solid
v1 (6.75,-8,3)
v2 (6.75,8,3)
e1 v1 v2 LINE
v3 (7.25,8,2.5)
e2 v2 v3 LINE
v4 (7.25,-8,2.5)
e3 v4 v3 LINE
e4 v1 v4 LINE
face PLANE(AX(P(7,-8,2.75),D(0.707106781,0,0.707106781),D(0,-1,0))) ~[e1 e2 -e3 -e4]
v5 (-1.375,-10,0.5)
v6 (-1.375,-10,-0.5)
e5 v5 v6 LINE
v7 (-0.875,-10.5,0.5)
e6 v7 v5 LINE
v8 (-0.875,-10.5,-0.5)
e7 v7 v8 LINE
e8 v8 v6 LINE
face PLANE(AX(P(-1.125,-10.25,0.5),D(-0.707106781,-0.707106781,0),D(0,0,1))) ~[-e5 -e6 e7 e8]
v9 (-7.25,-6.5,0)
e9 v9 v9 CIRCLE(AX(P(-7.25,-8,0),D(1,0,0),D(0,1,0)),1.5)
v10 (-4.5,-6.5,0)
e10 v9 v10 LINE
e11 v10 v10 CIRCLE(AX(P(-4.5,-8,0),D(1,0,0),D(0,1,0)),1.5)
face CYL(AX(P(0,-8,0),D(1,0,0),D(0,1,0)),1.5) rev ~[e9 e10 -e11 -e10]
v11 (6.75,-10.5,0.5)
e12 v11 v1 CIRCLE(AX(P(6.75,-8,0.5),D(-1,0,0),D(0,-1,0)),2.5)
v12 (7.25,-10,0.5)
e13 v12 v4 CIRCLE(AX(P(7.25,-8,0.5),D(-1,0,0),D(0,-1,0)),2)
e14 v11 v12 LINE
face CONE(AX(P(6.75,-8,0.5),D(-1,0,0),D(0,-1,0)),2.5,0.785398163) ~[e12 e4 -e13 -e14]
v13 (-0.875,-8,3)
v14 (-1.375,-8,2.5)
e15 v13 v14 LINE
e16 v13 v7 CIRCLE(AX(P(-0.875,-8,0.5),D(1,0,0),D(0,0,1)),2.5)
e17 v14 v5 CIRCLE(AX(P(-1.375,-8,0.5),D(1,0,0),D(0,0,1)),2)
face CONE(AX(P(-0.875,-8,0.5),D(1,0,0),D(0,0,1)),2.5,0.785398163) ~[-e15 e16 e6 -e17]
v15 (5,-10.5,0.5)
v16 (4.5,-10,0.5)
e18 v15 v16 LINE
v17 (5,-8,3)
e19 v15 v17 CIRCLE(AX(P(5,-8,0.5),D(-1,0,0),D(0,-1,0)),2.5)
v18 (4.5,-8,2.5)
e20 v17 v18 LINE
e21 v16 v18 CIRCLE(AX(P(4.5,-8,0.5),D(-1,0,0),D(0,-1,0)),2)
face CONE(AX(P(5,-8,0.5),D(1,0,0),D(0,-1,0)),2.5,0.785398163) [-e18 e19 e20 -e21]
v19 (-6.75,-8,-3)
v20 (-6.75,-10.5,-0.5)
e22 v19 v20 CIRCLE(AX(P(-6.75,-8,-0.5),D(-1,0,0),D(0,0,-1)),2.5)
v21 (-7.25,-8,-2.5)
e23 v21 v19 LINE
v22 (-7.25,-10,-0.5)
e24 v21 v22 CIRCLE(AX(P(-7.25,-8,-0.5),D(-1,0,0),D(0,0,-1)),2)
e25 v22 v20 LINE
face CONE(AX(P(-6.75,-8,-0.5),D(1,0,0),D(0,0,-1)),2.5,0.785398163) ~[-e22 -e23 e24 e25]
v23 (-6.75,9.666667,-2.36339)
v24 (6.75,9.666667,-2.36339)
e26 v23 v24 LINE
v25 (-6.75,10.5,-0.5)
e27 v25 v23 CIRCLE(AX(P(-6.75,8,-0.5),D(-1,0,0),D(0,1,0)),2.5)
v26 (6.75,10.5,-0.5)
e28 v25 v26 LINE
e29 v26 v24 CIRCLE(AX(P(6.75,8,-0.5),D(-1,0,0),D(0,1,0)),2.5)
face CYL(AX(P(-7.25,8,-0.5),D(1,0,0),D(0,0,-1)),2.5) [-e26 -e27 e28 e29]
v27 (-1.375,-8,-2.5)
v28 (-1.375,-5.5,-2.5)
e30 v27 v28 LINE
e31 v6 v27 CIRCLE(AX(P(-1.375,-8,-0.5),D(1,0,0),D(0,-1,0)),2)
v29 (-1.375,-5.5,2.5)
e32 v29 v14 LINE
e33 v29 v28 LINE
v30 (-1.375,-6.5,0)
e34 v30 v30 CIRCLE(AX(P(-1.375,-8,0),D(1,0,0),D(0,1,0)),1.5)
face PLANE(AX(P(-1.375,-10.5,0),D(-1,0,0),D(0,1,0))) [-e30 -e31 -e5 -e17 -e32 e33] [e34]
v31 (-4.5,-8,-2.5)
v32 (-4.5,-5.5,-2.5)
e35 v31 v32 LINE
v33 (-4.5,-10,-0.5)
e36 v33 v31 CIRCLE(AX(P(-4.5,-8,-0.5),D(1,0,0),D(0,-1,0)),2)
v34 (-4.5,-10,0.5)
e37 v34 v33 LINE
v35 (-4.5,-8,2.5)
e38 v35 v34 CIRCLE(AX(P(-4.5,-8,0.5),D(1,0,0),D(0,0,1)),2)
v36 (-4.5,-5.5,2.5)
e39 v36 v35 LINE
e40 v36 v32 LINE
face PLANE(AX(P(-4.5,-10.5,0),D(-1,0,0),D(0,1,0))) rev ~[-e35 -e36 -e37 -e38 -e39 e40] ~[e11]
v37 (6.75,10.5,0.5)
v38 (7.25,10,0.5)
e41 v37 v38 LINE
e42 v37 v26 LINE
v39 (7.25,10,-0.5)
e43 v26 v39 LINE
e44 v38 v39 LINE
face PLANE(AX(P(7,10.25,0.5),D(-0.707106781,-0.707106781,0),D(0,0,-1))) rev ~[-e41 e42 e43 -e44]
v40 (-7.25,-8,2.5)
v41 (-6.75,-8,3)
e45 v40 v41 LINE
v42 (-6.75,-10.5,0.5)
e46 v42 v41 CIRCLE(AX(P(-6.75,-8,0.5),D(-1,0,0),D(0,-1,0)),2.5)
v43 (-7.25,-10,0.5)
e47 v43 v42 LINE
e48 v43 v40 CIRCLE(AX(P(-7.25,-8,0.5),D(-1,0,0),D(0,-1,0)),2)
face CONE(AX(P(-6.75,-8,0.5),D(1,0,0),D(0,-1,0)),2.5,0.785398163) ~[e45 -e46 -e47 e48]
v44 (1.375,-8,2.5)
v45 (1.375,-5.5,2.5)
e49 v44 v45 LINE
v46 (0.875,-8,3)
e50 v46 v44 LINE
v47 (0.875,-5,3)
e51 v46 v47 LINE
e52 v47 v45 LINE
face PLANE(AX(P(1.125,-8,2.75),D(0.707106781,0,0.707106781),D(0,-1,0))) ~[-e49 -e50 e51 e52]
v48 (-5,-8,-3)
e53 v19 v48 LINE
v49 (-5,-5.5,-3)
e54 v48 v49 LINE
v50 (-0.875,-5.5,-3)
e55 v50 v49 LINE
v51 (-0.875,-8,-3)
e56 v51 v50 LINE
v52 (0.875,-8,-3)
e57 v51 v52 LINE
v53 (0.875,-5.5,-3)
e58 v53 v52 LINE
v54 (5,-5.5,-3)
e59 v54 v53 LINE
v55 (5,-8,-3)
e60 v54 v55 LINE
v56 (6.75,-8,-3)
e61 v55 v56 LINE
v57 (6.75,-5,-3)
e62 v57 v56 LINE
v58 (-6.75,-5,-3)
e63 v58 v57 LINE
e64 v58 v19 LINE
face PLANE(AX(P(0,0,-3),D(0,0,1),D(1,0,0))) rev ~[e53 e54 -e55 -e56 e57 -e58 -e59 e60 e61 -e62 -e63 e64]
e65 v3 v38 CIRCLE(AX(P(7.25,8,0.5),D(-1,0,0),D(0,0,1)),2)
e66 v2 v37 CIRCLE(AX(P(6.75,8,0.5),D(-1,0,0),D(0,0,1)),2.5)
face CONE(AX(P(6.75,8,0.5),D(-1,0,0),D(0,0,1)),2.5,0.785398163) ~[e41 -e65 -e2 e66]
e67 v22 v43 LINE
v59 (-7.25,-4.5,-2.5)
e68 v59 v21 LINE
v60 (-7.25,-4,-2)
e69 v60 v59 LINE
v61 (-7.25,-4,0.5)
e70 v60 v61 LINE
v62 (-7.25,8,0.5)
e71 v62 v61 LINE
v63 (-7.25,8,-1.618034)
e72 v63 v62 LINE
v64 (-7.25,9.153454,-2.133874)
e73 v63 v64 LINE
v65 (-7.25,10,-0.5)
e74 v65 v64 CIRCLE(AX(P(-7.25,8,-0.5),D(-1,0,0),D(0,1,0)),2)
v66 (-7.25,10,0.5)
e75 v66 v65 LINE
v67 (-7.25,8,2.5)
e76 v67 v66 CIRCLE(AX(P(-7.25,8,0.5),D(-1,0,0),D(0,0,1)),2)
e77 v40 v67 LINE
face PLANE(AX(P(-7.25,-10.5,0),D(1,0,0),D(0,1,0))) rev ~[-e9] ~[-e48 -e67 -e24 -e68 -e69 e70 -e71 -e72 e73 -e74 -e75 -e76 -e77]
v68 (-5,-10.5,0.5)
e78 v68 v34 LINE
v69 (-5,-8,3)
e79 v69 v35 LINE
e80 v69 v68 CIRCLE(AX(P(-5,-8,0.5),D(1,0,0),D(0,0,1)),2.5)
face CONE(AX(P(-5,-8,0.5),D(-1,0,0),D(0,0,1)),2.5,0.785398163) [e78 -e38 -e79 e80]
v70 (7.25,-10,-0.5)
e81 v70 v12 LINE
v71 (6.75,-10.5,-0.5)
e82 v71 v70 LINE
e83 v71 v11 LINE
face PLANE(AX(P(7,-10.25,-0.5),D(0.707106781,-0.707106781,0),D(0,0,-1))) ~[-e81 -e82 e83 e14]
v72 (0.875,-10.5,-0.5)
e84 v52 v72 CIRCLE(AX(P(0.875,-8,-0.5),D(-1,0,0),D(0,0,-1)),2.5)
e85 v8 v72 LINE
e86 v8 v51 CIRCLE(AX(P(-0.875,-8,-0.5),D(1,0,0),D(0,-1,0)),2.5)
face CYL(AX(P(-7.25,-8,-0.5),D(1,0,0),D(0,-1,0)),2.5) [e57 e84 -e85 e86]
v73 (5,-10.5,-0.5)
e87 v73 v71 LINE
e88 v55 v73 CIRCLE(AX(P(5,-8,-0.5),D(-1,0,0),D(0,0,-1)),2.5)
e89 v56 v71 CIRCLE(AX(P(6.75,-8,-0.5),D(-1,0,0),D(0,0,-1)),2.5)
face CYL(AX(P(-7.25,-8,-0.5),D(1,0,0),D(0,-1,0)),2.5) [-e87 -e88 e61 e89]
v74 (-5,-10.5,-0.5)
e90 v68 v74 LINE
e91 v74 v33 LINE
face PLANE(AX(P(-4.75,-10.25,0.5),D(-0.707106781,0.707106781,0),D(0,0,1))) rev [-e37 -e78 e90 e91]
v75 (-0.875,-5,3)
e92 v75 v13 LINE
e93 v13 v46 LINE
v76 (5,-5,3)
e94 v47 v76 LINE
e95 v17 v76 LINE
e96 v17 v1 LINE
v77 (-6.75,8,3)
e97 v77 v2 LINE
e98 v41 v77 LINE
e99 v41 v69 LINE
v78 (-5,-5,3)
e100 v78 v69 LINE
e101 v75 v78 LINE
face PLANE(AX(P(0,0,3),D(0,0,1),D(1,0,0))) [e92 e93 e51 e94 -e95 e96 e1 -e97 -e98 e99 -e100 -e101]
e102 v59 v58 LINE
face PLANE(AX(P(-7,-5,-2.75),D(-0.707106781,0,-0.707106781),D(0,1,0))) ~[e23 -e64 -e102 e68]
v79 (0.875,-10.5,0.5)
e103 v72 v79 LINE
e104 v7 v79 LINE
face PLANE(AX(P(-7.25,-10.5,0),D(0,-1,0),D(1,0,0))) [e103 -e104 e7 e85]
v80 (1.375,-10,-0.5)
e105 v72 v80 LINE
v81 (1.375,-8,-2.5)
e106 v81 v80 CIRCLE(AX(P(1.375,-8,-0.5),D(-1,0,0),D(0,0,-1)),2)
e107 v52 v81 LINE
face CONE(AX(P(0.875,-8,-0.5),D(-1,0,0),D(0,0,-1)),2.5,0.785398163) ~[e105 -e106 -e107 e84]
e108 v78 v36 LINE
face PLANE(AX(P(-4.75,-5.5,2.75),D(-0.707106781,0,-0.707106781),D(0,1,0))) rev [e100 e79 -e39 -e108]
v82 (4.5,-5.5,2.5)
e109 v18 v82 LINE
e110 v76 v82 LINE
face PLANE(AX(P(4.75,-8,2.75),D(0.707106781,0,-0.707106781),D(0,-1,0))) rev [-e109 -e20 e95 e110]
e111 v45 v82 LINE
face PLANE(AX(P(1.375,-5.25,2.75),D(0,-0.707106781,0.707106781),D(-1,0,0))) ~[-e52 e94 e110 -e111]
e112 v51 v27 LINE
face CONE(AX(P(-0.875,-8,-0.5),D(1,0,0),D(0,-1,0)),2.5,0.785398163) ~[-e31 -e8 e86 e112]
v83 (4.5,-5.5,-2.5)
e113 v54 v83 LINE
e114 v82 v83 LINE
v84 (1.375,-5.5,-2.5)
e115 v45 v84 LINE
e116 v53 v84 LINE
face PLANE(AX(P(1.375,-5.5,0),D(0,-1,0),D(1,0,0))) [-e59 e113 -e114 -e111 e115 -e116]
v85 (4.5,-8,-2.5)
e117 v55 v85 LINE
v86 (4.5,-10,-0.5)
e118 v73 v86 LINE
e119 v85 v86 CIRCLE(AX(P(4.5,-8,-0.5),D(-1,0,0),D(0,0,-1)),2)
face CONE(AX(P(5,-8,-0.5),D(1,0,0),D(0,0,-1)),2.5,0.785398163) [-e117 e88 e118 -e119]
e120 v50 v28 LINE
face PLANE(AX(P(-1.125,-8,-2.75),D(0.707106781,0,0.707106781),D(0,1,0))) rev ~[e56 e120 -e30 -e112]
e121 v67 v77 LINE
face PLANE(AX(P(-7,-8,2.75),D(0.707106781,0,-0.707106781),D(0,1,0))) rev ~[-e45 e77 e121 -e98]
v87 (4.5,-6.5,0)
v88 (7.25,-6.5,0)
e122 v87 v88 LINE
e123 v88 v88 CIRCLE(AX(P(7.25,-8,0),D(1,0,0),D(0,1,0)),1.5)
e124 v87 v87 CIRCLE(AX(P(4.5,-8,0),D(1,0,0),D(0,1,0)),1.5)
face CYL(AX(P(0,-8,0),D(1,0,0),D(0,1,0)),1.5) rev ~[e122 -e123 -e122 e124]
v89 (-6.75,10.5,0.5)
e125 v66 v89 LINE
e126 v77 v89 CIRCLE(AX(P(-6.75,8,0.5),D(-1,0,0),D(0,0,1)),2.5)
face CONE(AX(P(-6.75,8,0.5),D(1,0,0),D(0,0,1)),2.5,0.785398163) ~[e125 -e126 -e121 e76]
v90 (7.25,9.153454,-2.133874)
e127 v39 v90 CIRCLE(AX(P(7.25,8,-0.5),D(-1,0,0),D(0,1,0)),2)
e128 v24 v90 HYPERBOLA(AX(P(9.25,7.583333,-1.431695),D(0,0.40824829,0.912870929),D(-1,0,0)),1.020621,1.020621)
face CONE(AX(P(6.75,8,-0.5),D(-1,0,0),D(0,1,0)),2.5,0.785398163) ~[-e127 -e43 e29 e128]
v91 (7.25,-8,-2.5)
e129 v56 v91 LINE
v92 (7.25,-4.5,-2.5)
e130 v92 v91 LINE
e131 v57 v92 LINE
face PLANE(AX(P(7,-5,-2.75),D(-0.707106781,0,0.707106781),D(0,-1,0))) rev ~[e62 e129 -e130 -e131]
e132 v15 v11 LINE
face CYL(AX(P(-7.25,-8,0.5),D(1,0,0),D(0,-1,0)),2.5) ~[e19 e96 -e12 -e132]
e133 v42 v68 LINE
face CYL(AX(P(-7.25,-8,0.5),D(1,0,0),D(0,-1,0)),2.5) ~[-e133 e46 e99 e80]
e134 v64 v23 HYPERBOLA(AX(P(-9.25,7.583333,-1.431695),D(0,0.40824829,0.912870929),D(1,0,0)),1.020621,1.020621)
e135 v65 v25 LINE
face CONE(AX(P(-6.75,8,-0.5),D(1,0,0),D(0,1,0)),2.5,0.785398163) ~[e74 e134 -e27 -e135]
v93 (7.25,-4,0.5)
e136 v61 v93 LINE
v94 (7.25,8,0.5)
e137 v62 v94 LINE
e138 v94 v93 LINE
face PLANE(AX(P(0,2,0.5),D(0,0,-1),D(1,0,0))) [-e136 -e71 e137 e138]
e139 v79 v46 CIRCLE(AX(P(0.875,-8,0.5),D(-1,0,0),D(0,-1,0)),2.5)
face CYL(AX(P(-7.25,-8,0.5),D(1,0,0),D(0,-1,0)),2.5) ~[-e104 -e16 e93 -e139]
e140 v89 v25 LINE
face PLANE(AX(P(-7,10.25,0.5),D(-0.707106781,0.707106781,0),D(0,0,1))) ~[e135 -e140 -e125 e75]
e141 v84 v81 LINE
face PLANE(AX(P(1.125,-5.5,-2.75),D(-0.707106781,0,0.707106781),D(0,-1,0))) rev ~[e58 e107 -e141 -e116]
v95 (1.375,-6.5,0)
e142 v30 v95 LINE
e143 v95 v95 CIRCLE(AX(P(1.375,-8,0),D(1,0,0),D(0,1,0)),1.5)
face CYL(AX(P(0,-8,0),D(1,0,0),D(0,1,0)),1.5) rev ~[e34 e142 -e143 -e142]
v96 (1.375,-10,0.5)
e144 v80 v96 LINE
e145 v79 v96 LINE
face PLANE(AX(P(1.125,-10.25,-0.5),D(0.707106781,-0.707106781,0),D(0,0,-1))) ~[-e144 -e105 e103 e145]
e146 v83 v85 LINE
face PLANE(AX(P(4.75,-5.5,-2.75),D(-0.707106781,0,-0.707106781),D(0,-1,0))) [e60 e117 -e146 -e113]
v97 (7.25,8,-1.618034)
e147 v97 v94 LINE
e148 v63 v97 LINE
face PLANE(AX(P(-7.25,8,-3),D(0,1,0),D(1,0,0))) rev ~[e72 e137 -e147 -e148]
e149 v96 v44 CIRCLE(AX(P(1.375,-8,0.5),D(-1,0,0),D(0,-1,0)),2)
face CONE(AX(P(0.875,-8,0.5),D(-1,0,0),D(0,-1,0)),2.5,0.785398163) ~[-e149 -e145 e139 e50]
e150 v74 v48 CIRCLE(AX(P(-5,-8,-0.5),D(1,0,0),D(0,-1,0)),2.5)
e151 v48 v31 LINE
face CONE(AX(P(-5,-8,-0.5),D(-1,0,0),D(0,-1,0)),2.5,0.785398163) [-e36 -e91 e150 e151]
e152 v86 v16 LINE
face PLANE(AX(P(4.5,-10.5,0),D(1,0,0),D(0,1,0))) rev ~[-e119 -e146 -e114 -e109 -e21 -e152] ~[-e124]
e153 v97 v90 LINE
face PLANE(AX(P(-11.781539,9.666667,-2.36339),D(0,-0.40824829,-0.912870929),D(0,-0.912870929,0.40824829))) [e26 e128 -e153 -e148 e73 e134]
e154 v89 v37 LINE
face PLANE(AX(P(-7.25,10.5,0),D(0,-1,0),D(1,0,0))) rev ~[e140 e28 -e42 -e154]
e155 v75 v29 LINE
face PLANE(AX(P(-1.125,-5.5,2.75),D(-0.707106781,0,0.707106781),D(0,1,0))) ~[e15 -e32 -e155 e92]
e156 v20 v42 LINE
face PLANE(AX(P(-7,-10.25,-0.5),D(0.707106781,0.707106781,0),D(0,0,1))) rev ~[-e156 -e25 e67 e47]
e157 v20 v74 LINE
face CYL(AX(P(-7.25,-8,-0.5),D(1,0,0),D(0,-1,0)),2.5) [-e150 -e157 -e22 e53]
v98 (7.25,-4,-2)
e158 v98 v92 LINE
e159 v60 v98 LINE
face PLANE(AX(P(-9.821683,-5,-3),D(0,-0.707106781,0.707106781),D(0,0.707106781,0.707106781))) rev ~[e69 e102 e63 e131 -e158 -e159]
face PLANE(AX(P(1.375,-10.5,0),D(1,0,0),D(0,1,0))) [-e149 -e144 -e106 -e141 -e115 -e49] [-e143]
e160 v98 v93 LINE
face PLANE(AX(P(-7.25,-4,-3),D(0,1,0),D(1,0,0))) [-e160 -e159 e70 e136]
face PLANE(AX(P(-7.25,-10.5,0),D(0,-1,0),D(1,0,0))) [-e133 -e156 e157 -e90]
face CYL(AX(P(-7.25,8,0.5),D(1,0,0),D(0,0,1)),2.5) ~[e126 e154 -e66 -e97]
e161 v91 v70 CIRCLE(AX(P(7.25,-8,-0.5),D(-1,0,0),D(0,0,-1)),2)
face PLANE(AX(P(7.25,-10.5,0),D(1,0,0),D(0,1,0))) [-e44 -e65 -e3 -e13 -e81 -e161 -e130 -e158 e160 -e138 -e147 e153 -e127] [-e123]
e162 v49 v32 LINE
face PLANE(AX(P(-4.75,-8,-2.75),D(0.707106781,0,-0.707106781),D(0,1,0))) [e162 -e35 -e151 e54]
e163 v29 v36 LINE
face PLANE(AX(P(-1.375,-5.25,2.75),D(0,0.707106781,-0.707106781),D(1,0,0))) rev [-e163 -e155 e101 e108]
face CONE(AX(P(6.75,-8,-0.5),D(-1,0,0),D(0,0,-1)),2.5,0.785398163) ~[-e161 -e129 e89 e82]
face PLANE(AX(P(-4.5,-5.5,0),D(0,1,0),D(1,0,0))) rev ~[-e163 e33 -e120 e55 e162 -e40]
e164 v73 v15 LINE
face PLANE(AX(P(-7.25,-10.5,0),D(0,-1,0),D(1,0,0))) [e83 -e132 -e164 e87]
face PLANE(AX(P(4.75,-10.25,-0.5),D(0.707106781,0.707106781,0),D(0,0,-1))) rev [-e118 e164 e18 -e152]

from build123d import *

# Parameters (mm, degrees)
F0_W        = 14.5
F0_H        = 21
F1_DEPTH    = 3
F2_R        = 1.5
F3_DEPTH    = 25
F4_R        = 2.5
F5_W        = 3.125
F5_H        = 5
F6_DEPTH    = 12.5
F7_W        = 14.5
F7_H        = 12
F8_DEPTH    = 3.5
F9_T1_DEPTH = 19.6433659759
F9_T3_DEPTH = 23.5630770458
F10_SIZE    = 0.5


# Not quite as in the source:
# - a fillet or chamfer that OpenCascade refuses, or shapes differently, is made with other operations: its cross-section is extruded or revolved along the edge and cut away or added


with BuildPart() as f1:
    # F0 (on Top) → F1 (new body, symmetric)
    with BuildSketch(Plane.XY):
        Rectangle(F0_W, F0_H)
    extrude(amount=F1_DEPTH, both=True)

    # F2 (on Right) → F3 (cut, symmetric)
    with BuildSketch(Plane.YZ):
        with Locations((-8, 0)):
            Circle(F2_R)
    extrude(amount=F3_DEPTH, both=True, mode=Mode.SUBTRACT)

    # F4
    f4_edges = [f1.edges().sort_by_distance(p)[0] for p in [
        (0, -10.5, 3),
        (0, -10.5, -3),
        (0, 10.5, 3),
        (0, 10.5, -3),
    ]]
    fillet(f4_edges, radius=F4_R)

    # F5 (on Top) → F6 (cut, symmetric)
    with BuildSketch(Plane.XY):
        with Locations((-2.9375, -8)):
            Rectangle(F5_W, F5_H)
        with Locations((2.9375, -8)):
            Rectangle(F5_W, F5_H)
    extrude(amount=F6_DEPTH, both=True, mode=Mode.SUBTRACT)

    # F7 (on face) → F8 (cut)
    with BuildSketch(Plane(origin=(0, 0, -3), x_dir=(1, 0, 0), z_dir=(0, 0, -1))):
        with Locations((0, -2)):
            Rectangle(F7_W, F7_H)
    extrude(amount=-F8_DEPTH, mode=Mode.SUBTRACT)

    # F9: chamfer of 1 on 2 edges, made by hand

    # F9_s2 → F9_t1 (cut)
    with BuildSketch(Plane.YZ.offset(-9.821682988)):
        Polygon((-5, -3), (-4, -2), (-4, -3), align=None)
    extrude(amount=F9_T1_DEPTH, mode=Mode.SUBTRACT)

    # F9_s4 → F9_t3 (cut)
    with BuildSketch(Plane.YZ.offset(-11.7815385229)):
        with BuildLine():
            Line((9.6666666667, -2.3633899812), (8, -1.6180339887))
            Line((8, -1.6180339887), (8, -3))
            ThreePointArc((8, -3), (8.906095825, -2.8300193896), (9.6666666667, -2.3633899812))
        make_face()
    extrude(amount=F9_T3_DEPTH, mode=Mode.SUBTRACT)

    # F10
    f10_edges = [f1.edges().sort_by_distance(p)[0] for p in [
        (-7.25, 0, 3),
        (-4.5, -6.75, 3),
        (-1.375, -6.75, 3),
        (1.375, -6.75, 3),
        (4.5, -6.75, 3),
        (7.25, 0, 3),
        (2.9375, -5.5, 3),
        (-2.9375, -5.5, 3),
        (-7.25, 10.5, 0),
        (7.25, 10.5, 0),
        (-7.25, 9.767767, 2.267767),
        (-7.25, -9.767767, 2.267767),
        (-7.25, -10.5, 0),
        (-7.25, -9.767767, -2.267767),
        (-7.25, -6.5, -3),
        (-7.25, 10.282177, -1.520621),
        (7.25, 10.282177, -1.520621),
        (7.25, 9.767767, 2.267767),
        (7.25, -9.767767, -2.267767),
        (7.25, -10.5, 0),
        (7.25, -9.767767, 2.267767),
        (7.25, -6.5, -3),
        (-4.5, -9.767767, 2.267767),
        (-4.5, -10.5, 0),
        (-4.5, -9.767767, -2.267767),
        (4.5, -6.75, -3),
        (1.375, -6.75, -3),
        (-1.375, -6.75, -3),
        (-4.5, -6.75, -3),
        (4.5, -9.767767, -2.267767),
        (4.5, -10.5, 0),
        (4.5, -9.767767, 2.267767),
        (1.375, -9.767767, 2.267767),
        (1.375, -10.5, 0),
        (1.375, -9.767767, -2.267767),
        (-1.375, -9.767767, 2.267767),
        (-1.375, -10.5, 0),
        (-1.375, -9.767767, -2.267767),
    ]]
    chamfer(f10_edges, length=F10_SIZE)


solid = f1.part
